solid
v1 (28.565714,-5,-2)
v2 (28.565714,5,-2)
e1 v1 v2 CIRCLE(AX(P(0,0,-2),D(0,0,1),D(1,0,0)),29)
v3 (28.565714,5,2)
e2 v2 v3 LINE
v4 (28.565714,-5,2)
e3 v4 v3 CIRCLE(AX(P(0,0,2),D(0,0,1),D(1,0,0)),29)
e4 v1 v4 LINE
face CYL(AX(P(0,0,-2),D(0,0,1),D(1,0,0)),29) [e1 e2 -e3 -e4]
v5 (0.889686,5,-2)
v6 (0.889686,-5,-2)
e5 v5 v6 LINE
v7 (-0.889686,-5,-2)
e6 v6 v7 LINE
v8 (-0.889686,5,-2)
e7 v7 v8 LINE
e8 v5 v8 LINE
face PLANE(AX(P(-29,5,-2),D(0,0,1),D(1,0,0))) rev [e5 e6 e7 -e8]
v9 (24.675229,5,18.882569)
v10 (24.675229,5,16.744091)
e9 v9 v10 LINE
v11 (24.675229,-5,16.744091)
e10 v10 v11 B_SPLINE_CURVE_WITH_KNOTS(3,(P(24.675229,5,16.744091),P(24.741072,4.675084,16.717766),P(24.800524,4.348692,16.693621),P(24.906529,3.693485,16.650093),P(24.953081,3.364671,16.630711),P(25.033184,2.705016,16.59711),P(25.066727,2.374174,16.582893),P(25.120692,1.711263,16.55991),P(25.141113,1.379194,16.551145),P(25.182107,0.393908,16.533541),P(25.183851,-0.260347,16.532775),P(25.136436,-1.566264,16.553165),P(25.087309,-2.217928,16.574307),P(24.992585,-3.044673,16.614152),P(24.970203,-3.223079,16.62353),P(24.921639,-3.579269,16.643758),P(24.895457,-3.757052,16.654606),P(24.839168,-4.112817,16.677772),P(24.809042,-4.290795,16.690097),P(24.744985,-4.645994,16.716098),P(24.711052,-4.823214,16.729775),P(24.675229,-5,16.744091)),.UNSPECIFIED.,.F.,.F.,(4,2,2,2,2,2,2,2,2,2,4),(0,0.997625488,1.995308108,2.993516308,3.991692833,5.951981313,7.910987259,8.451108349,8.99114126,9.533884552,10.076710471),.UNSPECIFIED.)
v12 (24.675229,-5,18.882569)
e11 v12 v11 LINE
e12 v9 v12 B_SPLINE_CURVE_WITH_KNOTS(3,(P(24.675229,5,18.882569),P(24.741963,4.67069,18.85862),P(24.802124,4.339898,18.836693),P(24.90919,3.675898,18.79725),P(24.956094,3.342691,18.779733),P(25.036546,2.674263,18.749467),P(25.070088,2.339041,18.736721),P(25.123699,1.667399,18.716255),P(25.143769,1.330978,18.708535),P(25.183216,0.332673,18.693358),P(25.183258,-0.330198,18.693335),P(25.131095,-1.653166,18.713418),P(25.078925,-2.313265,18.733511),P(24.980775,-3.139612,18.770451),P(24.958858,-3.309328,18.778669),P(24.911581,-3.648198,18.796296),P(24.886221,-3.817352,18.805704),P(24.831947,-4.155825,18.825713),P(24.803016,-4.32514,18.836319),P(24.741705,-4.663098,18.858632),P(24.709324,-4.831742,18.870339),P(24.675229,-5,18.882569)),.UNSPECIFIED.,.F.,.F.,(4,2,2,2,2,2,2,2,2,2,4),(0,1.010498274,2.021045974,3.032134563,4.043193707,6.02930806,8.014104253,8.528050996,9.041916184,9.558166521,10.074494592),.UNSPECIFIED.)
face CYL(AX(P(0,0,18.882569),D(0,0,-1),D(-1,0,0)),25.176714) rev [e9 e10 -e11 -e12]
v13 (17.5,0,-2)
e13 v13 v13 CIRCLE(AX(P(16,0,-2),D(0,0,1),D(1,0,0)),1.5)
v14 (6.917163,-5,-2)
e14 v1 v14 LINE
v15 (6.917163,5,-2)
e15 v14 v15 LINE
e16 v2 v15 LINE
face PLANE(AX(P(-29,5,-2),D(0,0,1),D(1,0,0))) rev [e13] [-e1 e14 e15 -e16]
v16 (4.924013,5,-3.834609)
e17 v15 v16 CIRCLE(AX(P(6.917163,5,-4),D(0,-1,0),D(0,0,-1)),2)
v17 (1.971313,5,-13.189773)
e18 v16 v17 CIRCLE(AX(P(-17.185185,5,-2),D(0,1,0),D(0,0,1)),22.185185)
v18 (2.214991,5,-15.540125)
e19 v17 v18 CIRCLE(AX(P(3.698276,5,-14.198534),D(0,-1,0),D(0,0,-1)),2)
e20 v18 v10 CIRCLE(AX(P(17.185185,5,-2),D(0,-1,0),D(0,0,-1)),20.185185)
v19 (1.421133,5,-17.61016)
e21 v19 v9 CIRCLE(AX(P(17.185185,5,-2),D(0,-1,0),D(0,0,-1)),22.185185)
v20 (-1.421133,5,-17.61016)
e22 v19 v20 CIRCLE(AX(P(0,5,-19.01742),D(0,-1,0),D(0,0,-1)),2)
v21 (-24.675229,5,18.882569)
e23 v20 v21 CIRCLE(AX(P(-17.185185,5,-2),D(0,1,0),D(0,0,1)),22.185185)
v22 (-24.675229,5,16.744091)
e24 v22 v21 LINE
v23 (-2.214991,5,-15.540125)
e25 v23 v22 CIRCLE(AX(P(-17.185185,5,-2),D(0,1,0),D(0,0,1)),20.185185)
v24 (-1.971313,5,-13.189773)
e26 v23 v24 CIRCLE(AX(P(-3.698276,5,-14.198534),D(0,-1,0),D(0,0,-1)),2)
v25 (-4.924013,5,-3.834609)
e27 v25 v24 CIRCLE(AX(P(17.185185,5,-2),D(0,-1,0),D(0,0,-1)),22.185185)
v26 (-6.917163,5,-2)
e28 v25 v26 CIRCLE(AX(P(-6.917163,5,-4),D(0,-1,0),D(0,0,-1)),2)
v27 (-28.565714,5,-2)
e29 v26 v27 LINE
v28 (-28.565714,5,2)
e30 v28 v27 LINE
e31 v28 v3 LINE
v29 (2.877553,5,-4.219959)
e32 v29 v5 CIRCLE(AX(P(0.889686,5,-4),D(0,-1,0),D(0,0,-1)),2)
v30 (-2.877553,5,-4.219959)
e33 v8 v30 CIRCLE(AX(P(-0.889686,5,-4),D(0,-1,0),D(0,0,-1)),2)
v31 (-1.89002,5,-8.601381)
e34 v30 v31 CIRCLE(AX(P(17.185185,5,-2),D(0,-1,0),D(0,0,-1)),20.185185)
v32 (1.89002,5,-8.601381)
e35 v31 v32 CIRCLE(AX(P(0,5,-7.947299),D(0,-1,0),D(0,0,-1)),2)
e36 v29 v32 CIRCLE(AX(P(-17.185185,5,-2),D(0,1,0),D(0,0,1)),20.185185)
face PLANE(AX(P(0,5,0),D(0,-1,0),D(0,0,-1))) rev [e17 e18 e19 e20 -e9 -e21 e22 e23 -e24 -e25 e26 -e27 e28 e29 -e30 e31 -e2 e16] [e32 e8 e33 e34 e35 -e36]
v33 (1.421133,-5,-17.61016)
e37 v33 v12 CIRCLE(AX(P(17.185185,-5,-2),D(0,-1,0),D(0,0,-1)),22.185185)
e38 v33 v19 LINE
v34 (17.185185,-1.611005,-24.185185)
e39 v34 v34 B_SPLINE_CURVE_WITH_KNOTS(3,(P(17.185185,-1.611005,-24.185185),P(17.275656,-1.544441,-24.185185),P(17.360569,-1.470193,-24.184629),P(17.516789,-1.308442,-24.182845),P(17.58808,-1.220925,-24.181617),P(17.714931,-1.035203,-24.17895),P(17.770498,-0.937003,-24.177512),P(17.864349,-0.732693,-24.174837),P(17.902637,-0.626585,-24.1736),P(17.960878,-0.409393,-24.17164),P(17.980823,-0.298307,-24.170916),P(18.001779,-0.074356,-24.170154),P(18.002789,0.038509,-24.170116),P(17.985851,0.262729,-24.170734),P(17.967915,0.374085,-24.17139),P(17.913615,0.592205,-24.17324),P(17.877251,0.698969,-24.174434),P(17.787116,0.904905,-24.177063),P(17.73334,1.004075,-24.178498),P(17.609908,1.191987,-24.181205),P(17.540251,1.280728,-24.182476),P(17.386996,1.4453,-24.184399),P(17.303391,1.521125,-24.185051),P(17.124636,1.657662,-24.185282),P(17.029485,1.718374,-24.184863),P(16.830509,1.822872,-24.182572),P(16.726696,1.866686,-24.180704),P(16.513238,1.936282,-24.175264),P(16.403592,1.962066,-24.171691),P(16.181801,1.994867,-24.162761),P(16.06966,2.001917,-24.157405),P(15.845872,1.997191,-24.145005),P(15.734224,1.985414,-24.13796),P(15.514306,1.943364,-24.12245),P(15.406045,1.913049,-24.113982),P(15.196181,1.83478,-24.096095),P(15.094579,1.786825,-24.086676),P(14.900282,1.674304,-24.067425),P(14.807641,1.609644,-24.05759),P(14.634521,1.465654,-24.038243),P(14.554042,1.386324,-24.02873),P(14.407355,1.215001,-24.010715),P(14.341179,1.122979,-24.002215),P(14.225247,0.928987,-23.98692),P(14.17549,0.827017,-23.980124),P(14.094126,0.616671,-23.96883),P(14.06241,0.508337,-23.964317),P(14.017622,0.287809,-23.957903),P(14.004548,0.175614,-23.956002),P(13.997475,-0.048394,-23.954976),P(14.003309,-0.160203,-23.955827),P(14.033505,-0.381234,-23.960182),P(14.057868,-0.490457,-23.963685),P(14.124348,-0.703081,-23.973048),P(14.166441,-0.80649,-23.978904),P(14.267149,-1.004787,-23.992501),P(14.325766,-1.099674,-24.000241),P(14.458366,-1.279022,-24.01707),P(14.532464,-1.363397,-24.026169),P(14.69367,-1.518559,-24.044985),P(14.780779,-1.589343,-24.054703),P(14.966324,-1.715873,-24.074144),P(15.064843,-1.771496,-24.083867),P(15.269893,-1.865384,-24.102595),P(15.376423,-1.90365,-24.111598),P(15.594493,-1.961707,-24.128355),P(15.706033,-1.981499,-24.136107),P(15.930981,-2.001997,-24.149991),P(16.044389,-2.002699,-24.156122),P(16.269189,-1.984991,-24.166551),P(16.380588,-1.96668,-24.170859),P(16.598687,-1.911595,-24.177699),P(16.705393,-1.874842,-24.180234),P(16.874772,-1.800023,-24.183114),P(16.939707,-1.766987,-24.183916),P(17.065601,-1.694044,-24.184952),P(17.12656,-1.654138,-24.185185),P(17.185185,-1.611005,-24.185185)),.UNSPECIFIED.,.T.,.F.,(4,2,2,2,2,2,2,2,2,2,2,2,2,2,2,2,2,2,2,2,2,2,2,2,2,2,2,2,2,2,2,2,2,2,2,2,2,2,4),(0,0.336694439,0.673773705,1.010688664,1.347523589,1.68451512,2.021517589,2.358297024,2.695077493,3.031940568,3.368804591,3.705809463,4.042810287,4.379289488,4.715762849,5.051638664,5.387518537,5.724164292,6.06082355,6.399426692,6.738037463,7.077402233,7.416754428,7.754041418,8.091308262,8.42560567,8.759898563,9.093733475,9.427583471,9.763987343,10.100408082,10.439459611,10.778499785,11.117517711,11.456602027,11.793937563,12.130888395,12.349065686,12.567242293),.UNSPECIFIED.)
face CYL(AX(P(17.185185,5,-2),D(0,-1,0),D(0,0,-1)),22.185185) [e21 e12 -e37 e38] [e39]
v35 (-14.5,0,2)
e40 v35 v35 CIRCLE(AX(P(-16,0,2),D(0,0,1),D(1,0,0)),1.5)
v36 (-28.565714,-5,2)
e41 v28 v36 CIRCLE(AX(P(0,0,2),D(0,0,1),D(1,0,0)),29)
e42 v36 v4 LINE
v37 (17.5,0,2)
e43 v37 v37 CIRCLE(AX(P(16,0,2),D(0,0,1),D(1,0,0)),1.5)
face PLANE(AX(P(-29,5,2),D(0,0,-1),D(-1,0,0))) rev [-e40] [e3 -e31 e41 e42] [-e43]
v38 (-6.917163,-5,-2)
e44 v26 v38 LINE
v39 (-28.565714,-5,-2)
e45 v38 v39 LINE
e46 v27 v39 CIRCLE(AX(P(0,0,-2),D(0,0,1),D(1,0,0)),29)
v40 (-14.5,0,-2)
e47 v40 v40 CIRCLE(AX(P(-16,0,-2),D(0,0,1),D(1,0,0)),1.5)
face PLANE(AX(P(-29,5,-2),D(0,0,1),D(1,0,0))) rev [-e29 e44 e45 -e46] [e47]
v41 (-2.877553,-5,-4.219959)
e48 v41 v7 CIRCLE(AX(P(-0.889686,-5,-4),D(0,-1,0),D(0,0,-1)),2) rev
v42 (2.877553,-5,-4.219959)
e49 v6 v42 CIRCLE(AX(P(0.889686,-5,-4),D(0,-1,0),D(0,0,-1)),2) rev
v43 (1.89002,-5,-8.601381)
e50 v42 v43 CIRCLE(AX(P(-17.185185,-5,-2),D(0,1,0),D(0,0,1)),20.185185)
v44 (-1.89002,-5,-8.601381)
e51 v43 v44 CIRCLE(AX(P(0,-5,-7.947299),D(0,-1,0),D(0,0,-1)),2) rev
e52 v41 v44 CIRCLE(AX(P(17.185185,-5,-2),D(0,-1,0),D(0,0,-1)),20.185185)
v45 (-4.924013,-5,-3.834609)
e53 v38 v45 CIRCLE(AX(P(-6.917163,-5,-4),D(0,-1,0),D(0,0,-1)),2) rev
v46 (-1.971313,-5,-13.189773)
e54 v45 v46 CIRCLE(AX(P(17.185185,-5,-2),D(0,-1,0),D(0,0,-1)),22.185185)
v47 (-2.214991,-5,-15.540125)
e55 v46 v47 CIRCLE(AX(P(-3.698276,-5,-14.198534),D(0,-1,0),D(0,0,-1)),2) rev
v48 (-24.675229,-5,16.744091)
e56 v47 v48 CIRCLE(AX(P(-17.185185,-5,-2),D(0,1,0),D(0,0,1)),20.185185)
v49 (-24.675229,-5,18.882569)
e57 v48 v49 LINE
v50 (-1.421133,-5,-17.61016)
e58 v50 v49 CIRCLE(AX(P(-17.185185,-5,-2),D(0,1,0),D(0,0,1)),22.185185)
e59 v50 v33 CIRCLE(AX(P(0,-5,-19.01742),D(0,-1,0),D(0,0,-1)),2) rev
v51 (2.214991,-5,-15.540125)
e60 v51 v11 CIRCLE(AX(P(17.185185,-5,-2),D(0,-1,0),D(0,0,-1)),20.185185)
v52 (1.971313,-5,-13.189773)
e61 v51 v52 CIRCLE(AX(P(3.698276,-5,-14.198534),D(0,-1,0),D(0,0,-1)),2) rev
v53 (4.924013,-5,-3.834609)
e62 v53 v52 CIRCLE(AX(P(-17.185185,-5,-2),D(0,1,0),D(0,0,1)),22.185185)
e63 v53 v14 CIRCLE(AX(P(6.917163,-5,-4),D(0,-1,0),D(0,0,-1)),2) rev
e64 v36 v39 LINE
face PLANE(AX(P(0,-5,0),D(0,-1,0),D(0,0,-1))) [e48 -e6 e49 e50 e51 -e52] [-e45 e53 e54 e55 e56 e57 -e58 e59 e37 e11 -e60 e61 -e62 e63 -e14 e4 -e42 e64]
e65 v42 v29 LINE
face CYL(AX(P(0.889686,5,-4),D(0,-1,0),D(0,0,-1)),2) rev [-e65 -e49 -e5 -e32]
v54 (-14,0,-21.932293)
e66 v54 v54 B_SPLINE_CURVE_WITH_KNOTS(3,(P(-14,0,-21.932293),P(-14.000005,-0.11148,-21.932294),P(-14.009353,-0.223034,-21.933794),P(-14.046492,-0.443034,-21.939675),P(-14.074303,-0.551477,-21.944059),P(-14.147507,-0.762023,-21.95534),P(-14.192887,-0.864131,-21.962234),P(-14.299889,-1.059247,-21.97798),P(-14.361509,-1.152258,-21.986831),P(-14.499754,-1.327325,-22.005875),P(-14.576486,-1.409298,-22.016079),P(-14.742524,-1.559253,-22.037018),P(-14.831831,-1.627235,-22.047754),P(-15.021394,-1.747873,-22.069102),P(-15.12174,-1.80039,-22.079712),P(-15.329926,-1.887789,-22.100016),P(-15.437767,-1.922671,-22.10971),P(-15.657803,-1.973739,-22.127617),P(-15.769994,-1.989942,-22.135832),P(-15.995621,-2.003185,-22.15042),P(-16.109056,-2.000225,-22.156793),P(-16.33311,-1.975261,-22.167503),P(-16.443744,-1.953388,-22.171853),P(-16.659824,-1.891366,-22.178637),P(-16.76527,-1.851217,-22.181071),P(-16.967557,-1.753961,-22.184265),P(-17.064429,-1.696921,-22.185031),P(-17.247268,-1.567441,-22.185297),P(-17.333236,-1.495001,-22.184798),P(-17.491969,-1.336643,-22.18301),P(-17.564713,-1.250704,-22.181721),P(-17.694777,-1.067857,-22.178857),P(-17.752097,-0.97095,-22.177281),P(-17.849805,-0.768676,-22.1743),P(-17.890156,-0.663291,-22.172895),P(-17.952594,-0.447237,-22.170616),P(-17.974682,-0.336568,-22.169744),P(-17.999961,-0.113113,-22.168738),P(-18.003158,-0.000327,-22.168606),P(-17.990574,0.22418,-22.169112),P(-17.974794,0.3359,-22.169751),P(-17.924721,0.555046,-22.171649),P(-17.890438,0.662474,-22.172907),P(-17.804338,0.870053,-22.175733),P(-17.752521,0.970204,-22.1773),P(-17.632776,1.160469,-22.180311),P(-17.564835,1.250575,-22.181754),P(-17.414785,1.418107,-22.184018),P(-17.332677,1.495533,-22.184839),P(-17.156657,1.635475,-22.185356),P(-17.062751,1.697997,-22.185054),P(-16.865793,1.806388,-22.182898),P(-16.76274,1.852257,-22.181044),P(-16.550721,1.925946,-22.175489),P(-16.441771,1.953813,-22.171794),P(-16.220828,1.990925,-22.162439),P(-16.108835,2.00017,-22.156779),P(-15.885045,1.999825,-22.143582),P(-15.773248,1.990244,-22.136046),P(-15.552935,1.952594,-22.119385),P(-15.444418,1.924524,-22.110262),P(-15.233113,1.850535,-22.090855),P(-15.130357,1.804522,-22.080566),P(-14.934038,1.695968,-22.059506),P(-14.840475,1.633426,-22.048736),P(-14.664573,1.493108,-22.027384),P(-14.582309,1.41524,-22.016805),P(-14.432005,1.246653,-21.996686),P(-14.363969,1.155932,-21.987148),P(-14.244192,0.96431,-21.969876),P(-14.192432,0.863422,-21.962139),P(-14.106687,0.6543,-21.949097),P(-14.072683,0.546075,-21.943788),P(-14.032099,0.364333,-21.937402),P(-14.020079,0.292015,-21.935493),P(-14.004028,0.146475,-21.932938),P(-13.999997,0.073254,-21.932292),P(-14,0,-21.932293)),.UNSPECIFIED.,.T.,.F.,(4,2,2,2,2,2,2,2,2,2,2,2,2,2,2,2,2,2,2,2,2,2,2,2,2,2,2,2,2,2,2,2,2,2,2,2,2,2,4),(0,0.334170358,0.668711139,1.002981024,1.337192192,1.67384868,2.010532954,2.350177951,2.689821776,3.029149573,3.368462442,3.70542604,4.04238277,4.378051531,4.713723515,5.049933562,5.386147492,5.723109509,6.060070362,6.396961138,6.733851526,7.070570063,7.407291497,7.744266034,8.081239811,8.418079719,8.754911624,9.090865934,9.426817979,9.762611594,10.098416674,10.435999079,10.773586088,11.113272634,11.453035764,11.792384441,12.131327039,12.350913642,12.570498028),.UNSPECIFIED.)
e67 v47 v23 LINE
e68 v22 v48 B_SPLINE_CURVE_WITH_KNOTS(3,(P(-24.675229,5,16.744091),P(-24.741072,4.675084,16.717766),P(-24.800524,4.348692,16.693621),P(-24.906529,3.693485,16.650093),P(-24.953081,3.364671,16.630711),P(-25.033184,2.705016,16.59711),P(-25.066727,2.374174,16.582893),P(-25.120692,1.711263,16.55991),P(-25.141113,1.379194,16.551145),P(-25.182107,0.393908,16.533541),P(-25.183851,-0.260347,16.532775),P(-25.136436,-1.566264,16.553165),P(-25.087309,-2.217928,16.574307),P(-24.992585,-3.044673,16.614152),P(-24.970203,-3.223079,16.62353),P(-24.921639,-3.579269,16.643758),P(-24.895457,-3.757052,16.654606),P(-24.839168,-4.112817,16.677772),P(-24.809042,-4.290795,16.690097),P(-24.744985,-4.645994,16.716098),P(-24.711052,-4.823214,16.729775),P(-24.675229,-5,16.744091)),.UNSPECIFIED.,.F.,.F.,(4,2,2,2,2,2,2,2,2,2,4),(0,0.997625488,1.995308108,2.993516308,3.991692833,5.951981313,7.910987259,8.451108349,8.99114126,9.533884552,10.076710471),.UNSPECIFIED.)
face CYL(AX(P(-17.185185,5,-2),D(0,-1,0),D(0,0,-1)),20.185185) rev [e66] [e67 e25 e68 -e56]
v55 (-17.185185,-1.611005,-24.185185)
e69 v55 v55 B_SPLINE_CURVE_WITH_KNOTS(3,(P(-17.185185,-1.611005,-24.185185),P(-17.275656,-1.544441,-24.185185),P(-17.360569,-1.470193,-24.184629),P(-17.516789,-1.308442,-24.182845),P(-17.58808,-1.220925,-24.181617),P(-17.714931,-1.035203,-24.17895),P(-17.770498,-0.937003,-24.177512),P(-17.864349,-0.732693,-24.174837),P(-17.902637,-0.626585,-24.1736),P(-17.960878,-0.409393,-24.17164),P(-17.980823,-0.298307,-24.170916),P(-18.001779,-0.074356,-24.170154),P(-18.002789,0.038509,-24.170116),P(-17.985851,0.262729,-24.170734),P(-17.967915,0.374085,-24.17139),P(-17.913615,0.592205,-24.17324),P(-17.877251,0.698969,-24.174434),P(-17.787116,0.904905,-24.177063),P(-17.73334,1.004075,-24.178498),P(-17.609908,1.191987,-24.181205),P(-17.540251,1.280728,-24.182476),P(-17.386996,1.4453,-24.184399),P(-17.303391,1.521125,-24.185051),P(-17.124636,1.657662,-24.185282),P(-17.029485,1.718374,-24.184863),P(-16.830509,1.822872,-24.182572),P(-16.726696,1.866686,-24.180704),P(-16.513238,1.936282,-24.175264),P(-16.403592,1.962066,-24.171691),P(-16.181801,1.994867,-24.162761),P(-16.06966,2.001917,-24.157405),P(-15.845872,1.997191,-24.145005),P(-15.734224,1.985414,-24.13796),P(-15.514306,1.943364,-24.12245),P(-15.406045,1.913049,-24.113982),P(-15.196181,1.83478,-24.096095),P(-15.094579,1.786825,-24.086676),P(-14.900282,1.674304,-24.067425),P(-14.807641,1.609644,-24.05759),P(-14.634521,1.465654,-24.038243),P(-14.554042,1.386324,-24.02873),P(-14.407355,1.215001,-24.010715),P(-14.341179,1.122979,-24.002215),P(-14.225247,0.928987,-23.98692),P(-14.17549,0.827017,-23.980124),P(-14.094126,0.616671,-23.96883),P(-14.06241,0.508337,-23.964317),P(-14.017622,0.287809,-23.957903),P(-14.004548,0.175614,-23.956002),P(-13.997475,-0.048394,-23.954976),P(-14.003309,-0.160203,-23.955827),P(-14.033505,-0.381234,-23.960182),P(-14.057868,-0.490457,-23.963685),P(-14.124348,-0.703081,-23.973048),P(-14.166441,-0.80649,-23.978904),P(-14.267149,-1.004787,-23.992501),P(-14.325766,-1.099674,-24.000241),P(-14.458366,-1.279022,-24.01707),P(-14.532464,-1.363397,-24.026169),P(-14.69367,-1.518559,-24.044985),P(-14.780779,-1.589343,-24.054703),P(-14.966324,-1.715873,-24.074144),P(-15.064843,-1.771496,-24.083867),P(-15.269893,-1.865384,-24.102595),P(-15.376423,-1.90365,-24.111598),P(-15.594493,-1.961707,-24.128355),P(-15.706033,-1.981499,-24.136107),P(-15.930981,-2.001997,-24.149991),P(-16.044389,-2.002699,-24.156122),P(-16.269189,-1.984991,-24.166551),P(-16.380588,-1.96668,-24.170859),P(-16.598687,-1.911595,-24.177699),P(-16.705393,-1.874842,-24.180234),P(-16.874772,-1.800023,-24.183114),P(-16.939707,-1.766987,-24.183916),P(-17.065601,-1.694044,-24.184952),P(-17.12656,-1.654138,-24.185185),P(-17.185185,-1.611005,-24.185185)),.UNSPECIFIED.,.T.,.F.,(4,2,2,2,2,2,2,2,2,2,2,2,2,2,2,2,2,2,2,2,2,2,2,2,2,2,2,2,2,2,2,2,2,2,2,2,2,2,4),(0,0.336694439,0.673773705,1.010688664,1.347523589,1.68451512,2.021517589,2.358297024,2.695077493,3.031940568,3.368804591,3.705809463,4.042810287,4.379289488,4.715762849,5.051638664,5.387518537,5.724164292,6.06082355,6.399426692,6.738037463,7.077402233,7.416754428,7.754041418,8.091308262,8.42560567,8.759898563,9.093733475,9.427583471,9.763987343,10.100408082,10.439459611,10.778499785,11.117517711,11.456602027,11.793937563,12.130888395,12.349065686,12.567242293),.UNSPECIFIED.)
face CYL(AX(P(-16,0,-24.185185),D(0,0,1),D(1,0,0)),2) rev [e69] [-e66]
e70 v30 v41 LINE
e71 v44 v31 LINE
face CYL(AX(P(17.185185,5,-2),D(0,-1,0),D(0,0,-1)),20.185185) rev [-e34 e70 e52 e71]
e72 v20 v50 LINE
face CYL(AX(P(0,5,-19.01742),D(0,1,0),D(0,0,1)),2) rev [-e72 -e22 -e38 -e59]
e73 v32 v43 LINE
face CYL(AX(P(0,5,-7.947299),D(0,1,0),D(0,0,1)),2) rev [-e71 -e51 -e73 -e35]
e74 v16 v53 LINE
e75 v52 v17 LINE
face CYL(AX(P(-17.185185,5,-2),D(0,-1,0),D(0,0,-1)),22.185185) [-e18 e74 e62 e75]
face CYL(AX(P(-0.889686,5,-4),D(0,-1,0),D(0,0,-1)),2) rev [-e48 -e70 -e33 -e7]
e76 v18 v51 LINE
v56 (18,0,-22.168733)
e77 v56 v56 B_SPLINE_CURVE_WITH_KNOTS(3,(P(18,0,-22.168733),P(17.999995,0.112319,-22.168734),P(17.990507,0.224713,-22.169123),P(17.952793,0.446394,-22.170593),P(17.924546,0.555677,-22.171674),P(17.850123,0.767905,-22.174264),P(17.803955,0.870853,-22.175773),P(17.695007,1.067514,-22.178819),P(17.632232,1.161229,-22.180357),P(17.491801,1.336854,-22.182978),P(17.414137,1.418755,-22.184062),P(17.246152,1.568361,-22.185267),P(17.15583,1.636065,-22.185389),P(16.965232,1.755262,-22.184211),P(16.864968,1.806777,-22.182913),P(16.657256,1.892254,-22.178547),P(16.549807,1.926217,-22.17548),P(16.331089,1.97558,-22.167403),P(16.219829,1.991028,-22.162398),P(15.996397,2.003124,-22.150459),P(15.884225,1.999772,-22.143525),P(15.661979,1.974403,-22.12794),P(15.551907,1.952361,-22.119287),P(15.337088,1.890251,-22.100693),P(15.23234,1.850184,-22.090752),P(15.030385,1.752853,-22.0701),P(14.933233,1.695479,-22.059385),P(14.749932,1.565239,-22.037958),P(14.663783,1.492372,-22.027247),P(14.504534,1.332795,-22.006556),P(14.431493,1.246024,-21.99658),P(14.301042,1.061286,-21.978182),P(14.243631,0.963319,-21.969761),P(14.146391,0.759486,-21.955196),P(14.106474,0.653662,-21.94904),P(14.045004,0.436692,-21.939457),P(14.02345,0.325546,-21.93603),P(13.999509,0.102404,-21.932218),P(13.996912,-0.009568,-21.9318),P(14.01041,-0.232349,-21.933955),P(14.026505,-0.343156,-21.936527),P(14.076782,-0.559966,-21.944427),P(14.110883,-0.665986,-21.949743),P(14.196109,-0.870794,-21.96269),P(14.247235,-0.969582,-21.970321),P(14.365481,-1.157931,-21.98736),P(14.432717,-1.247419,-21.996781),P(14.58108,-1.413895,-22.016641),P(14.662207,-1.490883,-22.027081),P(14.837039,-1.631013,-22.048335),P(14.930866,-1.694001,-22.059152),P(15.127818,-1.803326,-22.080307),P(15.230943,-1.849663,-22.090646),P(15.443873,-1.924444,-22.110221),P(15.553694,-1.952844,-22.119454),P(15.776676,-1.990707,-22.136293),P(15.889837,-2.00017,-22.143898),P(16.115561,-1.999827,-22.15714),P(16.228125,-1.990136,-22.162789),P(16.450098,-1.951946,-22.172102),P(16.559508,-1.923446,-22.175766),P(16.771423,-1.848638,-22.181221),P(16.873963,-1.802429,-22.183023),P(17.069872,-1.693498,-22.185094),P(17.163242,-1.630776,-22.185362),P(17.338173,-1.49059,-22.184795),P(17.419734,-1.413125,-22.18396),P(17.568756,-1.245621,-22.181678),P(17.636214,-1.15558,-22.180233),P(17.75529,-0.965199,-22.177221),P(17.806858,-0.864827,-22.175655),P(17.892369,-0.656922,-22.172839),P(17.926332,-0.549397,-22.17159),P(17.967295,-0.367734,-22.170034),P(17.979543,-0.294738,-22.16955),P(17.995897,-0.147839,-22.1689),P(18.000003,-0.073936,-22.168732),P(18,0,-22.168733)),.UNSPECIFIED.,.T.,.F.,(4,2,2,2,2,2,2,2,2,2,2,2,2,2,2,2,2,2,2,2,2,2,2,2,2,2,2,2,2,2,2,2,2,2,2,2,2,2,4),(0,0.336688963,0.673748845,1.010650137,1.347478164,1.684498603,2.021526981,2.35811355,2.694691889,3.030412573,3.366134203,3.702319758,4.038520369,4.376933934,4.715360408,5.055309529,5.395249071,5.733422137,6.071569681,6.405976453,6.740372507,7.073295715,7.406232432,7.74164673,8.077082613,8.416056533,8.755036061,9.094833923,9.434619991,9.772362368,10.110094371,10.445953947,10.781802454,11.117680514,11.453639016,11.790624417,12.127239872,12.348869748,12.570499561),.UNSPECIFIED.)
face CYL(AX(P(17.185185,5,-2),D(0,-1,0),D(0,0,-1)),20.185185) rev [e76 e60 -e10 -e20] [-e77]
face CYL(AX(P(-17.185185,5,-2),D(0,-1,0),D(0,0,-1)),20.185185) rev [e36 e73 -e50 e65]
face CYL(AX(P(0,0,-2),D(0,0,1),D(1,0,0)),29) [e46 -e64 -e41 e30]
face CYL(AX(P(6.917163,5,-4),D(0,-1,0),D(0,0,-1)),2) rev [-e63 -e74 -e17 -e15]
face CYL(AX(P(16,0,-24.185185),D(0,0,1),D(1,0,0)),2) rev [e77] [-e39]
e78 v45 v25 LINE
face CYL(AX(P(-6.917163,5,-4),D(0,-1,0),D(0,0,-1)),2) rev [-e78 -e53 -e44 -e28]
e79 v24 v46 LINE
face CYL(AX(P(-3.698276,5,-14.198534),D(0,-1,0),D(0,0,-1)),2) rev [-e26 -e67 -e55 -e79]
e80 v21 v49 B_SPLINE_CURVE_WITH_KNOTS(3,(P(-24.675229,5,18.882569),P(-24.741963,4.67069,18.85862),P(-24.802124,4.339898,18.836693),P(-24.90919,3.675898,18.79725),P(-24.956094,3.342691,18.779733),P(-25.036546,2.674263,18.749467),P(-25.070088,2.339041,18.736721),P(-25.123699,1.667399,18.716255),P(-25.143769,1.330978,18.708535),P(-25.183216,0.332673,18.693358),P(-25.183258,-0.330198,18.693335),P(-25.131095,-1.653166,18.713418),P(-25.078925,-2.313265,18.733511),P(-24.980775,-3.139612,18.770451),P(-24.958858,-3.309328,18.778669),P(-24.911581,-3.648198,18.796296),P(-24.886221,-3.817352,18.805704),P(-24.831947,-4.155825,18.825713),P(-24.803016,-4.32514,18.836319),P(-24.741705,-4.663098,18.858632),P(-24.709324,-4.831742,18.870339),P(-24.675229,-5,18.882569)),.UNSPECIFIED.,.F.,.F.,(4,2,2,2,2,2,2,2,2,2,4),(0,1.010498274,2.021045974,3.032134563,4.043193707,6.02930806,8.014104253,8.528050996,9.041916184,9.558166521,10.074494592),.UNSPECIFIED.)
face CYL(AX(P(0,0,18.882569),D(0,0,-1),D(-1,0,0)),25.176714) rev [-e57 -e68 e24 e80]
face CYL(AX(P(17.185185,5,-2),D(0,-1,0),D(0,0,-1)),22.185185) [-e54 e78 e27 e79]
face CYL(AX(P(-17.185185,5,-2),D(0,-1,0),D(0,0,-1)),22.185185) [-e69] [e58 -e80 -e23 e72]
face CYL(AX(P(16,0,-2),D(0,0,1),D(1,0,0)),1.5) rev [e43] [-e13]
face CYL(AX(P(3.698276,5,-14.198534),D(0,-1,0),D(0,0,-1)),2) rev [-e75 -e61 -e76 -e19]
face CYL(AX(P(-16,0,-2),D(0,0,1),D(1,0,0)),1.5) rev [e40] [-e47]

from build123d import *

# Parameters (mm, degrees)
SKETCH2_W               = 58
SKETCH2_H               = 4
BOSS_EXTRUDE1_DEPTH     = 5
CUT_EXTRUDE4_START      = -2
CUT_EXTRUDE4_DEPTH      = 4
CUT_EXTRUDE8_DEPTH      = 30.495762408
CUT_EXTRUDE8_DEPTH_BACK = 30.495762408
SKETCH4_R               = 1.5
BOSS_EXTRUDE2_DEPTH     = 5
SKETCH6_R               = 25.176714318
CUT_EXTRUDE7_DEPTH      = 48.546713727
SKETCH8_R               = 2
CUT_EXTRUDE9_DEPTH      = 46.466564837
FILLET1_R               = 2


# Read off the part's stored shape, not the designer's step: Cut-Extrude4
with BuildPart() as part:
    # Sketch2 → Boss-Extrude1 (new, symmetric)
    with BuildSketch(Plane(origin=(0, 0, 0), x_dir=(1, 0, 0), z_dir=(0, 1, 0))):
        Rectangle(SKETCH2_W, SKETCH2_H)
    extrude(amount=BOSS_EXTRUDE1_DEPTH, both=True)

    # Cut-Extrude4 outline → Cut-Extrude4 (cut)
    with BuildSketch(Plane.XY.offset(CUT_EXTRUDE4_START)):
        with BuildLine():
            ThreePointArc((-29, 2.66e-07), (-28.891224415, 2.509412642), (-28.565713714, 5))
            Line((-28.565713714, 5), (-29, 5))
            Line((-29, 5), (-29, 2.66e-07))
        make_face()
        with BuildLine():
            ThreePointArc((-28.565713714, -5), (-28.891224438, -2.509412377), (-29, 2.66e-07))
            Line((-29, 2.66e-07), (-29, -5))
            Line((-29, -5), (-28.565713714, -5))
        make_face()
        with BuildLine():
            Line((29, 5), (28.565713714, 5))
            ThreePointArc((28.565713714, 5), (28.891224438, 2.509412377), (29, -2.66e-07))
            Line((29, -2.66e-07), (29, 5))
        make_face()
        with BuildLine():
            Line((29, -5), (29, -2.66e-07))
            ThreePointArc((29, -2.66e-07), (28.891224415, -2.509412642), (28.565713714, -5))
            Line((28.565713714, -5), (29, -5))
        make_face()
    extrude(amount=CUT_EXTRUDE4_DEPTH, mode=Mode.SUBTRACT)

    # Sketch4 → Cut-Extrude8 (cut, two sides: drawn at the far end of the back side and taken through both)
    with BuildSketch(Plane.XY.offset(-CUT_EXTRUDE8_DEPTH_BACK)):
        with Locations((16, 0)):
            Circle(SKETCH4_R)
        with Locations((-16, 0)):
            Circle(SKETCH4_R)
    extrude(amount=CUT_EXTRUDE8_DEPTH + CUT_EXTRUDE8_DEPTH_BACK, mode=Mode.SUBTRACT)

    # Sketch5 → Boss-Extrude2 (add, symmetric)
    with BuildSketch(Plane(origin=(0, 0, 0), x_dir=(1, 0, 0), z_dir=(0, 1, 0))):
        with BuildLine():
            Line((-24, -17), (-24.675229358, -18.882568807))
            ThreePointArc((-24.675229358, -18.882568807), (-29.952612974, 20.143186858), (5, 2))
            Line((5, 2), (3, 2))
            ThreePointArc((3, 2), (-28.801626162, 18.507574019), (-24, -17))
        make_face()
        with BuildLine():
            Line((-3, 2), (-5, 2))
            ThreePointArc((-5, 2), (29.952612974, 20.143186858), (24.675229358, -18.882568807))
            Line((24.675229358, -18.882568807), (24, -17))
            ThreePointArc((24, -17), (28.801626162, 18.507574019), (-3, 2))
        make_face()
    extrude(amount=BOSS_EXTRUDE2_DEPTH, both=True)

    # Sketch6 → Cut-Extrude7 (cut, through all)
    with BuildSketch(Plane.XY.offset(2)):
        Circle(SKETCH6_R)
    extrude(amount=CUT_EXTRUDE7_DEPTH, mode=Mode.SUBTRACT)

    # Sketch8 → Cut-Extrude9 (cut, through all)
    with BuildSketch(Plane(origin=(0, 0, -2), x_dir=(-1, 0, 0), z_dir=(0, 0, -1))):
        with Locations(Location((16, 0, 0), (0, 0, 180))):
            Circle(SKETCH8_R)
        with Locations(Location((-16, 0, 0), (0, 0, 180))):
            Circle(SKETCH8_R)
    extrude(amount=CUT_EXTRUDE9_DEPTH, mode=Mode.SUBTRACT)

    # Fillet1
    fillet1_edges = [part.edges().sort_by_distance(p)[0] for p in [
        (0, 0, -16.030390296),
        (0, 0, -12.58825345),
        (3, 0, -2),
        (5, 0, -2),
        (-5, 0, -2),
        (-3, 0, -2),
        (-1.232758621, 0, -14.367772138),
        (1.232758621, 0, -14.367772138),
    ]]
    fillet(fillet1_edges, radius=FILLET1_R)


solid = part.part
